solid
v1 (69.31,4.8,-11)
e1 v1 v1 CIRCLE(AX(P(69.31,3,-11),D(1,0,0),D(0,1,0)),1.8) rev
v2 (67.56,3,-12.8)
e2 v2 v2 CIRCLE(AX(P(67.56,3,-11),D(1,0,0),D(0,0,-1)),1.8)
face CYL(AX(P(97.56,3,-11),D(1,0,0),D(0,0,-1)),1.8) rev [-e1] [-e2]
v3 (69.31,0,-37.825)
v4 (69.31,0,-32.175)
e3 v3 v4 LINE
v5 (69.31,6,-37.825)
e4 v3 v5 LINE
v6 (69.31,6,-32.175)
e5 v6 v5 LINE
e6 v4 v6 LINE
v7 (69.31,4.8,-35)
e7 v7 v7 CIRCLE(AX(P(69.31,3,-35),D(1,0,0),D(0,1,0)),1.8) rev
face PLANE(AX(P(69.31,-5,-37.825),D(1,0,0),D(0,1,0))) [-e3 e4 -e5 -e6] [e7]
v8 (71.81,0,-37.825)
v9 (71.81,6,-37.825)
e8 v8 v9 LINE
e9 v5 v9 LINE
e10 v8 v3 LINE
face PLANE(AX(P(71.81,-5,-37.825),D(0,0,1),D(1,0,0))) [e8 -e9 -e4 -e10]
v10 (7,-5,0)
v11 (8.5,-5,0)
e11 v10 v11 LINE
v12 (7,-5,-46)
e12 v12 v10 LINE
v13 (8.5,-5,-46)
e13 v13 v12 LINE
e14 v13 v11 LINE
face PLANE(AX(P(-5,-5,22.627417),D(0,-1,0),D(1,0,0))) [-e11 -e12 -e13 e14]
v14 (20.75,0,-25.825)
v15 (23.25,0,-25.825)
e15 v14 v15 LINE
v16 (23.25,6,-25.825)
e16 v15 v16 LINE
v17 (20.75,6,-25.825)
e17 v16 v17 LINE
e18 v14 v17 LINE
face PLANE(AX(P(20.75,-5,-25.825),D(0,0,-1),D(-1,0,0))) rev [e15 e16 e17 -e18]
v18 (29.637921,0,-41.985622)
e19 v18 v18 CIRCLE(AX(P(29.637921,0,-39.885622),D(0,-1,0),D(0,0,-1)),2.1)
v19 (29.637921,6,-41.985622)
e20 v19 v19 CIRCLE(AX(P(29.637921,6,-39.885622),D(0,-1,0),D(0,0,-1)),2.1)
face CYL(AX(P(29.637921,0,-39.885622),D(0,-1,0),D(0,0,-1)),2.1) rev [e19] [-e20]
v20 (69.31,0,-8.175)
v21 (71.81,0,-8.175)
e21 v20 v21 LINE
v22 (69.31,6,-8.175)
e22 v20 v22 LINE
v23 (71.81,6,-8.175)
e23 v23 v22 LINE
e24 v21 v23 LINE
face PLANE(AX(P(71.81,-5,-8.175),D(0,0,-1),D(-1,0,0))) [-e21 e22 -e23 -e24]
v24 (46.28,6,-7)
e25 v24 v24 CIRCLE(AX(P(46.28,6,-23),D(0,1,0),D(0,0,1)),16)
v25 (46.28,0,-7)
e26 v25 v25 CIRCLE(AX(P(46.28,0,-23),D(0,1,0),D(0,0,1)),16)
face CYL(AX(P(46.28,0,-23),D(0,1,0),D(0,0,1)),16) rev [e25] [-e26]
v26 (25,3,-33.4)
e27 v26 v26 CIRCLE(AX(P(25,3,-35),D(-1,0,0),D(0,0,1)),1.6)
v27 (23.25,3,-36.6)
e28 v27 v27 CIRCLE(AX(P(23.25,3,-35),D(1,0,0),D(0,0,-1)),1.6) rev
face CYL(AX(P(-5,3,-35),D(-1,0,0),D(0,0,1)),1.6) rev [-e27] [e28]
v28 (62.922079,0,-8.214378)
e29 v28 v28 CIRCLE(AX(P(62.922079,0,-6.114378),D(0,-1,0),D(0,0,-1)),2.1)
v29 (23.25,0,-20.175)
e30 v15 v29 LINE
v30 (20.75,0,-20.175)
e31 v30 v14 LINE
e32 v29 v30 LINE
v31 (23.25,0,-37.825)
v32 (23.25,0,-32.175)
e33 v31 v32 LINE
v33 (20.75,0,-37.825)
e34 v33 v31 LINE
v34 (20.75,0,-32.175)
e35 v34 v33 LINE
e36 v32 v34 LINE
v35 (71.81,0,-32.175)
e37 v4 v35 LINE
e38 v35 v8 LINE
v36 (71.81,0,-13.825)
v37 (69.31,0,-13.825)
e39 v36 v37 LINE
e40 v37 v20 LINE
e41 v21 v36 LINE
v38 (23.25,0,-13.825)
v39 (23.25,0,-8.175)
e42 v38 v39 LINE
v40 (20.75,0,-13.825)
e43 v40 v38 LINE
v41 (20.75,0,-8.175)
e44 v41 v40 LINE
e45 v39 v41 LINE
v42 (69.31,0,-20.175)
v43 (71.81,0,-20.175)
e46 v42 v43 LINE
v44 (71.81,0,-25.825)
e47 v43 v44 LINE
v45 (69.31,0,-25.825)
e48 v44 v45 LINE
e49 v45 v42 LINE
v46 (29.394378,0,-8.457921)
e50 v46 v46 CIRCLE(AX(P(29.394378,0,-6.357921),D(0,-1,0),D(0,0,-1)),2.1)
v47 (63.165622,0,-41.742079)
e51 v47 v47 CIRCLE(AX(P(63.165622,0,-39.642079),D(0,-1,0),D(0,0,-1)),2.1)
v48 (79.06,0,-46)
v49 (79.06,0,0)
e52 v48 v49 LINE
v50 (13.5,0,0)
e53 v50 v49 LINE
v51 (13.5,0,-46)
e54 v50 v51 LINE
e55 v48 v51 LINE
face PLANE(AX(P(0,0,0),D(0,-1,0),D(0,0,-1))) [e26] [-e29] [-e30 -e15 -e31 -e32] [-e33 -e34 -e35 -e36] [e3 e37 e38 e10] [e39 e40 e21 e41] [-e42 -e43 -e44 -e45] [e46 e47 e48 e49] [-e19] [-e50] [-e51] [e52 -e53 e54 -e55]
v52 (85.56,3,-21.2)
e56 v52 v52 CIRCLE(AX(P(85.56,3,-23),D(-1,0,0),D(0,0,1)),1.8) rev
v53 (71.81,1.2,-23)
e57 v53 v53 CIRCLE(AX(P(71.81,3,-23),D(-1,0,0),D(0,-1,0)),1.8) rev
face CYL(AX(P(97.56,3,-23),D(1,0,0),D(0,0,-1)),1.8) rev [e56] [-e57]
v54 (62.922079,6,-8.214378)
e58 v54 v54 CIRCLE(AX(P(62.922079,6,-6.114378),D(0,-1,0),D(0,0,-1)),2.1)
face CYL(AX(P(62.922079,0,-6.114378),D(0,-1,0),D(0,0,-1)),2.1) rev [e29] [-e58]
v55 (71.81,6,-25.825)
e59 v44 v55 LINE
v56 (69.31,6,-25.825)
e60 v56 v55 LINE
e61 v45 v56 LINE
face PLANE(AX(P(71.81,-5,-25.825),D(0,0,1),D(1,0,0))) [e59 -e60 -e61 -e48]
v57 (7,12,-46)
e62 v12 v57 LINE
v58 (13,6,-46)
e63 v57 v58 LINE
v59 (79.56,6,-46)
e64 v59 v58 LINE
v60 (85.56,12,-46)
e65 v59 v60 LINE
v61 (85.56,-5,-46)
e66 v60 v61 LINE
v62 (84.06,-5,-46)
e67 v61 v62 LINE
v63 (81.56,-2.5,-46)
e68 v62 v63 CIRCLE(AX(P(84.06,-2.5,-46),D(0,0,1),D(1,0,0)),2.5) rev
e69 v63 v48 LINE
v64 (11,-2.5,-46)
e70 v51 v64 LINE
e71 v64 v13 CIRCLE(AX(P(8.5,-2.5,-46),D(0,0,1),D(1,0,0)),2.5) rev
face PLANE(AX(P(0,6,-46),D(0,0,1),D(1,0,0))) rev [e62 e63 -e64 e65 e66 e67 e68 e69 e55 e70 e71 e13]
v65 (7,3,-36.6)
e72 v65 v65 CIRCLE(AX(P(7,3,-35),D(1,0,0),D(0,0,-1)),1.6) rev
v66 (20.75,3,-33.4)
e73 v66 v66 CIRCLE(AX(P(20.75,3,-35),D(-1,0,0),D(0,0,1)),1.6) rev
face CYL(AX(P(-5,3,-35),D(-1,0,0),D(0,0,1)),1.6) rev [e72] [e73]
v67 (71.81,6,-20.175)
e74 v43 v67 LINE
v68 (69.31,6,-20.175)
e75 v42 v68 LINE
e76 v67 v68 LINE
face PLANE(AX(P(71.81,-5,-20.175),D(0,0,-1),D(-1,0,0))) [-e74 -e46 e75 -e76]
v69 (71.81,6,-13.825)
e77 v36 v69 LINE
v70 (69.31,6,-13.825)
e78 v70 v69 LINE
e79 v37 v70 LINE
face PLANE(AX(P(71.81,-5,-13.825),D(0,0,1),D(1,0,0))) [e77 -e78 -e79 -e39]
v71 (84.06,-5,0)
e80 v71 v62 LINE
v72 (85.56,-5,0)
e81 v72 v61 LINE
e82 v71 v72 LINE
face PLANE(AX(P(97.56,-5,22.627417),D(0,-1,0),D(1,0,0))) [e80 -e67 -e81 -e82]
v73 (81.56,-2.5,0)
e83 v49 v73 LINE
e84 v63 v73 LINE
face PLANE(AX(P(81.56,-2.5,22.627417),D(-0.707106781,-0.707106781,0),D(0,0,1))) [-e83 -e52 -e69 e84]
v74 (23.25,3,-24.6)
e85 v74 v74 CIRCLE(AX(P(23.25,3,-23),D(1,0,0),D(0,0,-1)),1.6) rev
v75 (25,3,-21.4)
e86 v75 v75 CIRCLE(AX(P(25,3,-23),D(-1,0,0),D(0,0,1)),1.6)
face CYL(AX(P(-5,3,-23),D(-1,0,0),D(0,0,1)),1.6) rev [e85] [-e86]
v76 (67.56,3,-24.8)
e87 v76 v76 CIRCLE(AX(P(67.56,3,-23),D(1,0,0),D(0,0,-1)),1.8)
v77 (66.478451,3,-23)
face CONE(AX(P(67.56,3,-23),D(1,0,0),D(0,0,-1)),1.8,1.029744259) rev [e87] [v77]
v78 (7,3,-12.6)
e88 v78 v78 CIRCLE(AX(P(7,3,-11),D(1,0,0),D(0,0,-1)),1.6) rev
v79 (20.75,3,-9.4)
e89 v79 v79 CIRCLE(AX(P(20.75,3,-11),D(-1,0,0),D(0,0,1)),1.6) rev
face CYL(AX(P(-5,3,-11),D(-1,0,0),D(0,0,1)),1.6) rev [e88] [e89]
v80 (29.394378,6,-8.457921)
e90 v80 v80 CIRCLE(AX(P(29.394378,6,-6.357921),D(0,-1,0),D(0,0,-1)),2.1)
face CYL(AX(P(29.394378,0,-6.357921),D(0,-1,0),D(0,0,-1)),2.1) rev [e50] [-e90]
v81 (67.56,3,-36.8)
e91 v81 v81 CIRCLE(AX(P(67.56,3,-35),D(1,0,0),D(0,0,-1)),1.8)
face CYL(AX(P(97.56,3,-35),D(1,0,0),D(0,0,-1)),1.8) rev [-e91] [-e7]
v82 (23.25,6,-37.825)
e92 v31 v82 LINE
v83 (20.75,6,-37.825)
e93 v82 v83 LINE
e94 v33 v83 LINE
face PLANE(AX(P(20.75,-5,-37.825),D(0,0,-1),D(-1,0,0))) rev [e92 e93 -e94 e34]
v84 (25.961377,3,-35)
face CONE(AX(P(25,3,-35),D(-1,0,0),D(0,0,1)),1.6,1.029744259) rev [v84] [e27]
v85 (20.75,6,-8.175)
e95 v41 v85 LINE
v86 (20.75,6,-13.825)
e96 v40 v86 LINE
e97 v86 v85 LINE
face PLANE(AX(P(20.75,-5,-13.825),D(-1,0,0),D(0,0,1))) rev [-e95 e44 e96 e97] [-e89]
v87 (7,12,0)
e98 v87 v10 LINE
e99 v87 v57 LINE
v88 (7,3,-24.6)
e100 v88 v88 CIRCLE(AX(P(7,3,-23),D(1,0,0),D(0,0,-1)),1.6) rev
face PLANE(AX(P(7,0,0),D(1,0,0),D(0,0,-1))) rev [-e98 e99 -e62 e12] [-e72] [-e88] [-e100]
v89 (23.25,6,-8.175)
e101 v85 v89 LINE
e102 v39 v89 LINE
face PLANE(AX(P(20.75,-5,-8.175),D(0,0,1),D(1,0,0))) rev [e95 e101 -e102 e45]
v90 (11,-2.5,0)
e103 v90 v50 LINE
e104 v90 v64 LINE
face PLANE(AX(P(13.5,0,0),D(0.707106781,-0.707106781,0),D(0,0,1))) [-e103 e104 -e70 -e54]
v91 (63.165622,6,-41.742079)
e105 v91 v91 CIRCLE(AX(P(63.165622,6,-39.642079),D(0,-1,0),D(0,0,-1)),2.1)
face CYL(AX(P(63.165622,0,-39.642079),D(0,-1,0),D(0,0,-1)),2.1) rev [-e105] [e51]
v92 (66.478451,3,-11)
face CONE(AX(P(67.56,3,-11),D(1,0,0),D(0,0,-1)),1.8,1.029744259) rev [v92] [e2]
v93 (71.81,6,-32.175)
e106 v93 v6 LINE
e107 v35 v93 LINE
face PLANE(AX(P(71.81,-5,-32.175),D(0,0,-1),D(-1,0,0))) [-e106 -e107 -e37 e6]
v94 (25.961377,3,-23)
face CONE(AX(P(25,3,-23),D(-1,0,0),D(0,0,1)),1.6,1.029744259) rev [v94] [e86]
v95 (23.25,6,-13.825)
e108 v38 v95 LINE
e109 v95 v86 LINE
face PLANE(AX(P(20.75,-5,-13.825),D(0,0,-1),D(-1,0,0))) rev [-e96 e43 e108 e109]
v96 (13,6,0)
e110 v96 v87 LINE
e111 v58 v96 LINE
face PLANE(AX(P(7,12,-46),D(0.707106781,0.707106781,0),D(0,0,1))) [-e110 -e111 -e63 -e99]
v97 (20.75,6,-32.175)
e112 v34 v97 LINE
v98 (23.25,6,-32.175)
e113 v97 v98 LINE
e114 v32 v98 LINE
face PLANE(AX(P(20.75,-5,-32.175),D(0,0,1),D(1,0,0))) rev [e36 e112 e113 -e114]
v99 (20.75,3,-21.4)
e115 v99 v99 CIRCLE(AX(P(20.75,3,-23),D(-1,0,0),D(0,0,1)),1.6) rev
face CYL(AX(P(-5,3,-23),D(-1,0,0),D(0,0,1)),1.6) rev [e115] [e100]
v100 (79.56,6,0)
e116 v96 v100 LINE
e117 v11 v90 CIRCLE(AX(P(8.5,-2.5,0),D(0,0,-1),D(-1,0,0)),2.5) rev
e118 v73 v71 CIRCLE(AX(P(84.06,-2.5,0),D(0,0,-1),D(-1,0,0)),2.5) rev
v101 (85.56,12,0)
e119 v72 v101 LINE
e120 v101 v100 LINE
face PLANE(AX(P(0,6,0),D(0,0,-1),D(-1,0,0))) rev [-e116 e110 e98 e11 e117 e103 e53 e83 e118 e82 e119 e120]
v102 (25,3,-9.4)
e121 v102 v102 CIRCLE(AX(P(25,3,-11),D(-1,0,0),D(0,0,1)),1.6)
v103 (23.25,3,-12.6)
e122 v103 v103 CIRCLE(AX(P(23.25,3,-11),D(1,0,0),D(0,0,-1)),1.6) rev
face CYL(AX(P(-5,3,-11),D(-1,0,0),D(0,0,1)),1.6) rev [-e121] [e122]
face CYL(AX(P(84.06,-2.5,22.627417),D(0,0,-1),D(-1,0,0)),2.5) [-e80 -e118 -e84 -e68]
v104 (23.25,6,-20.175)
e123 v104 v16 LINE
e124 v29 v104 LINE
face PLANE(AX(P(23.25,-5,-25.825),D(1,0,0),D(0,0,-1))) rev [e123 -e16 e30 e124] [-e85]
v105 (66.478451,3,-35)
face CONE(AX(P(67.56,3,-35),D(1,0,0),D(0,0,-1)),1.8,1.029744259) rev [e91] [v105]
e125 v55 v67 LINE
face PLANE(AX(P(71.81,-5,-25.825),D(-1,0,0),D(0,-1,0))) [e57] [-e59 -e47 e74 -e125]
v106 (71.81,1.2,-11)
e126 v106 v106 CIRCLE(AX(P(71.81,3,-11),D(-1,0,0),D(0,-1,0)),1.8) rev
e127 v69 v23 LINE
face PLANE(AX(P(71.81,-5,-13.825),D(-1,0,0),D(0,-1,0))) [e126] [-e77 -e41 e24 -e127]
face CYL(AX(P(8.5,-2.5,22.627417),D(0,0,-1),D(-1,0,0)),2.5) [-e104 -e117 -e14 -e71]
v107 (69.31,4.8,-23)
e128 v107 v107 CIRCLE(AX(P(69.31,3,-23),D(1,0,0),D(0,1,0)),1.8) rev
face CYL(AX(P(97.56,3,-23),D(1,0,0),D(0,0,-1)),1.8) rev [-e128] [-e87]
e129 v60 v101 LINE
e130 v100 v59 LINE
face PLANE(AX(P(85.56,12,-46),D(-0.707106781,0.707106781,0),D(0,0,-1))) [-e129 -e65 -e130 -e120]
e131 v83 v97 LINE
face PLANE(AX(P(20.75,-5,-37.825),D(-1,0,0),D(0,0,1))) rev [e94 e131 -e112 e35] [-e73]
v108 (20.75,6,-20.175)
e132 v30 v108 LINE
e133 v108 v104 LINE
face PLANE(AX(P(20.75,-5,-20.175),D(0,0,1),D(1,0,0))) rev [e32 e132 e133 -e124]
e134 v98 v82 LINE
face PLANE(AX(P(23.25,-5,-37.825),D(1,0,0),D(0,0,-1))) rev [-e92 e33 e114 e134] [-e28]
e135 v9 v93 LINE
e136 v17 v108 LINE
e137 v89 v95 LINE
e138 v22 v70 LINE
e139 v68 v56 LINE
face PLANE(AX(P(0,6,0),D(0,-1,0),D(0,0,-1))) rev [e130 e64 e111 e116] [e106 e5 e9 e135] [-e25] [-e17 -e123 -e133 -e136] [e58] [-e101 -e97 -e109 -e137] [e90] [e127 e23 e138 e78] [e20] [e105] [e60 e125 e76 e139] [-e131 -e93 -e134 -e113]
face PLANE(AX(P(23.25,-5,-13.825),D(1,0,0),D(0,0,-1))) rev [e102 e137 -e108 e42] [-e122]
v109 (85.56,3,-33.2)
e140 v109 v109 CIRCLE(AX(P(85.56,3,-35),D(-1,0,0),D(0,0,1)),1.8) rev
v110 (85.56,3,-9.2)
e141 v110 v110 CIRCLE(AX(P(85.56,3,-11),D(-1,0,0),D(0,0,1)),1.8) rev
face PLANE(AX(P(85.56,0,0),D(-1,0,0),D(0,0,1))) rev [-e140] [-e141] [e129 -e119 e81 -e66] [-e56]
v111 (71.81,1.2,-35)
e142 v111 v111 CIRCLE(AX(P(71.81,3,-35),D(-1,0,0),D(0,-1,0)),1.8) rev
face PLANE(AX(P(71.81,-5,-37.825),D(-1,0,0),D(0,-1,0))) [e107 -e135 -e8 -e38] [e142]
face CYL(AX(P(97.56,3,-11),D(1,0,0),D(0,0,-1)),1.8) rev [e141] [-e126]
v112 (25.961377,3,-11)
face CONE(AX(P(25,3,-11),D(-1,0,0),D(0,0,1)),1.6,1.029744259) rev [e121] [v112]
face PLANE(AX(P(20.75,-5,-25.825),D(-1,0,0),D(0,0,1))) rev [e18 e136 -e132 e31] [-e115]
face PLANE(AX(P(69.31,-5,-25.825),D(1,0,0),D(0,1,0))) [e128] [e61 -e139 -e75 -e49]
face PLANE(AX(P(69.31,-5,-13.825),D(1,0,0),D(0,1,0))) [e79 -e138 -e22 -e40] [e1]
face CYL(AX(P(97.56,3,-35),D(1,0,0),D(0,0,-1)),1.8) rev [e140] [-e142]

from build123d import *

# Parameters (mm, degrees)
SKETCH1_W                                           = 92.56
SKETCH1_H                                           = 46
BOSS_EXTRUDE1_DEPTH                                 = 6
SKETCH2_W                                           = 7
SKETCH2_H                                           = 46
BOSS_EXTRUDE2_DEPTH                                 = 54
SKETCH3_R                                           = 16
CUT_EXTRUDE1_DEPTH                                  = 120.512985069
SKETCH4_R                                           = 16
CUT_EXTRUDE2_DEPTH                                  = 117.616266447
F_4_2_4_2_DIAMETER_HOLE1_D                          = 4.2
F_4_2_4_2_DIAMETER_HOLE2_D                          = 4.2
CHAMFER1_SIZE                                       = 3.5
CHAMFER2_SIZE                                       = 6
BOSS_EXTRUDE3_DEPTH                                 = 46
FILLET1_R                                           = 2.5
CHAMFER3_SIZE                                       = 2.5
FILLET2_R                                           = 2.5
CSK_FOR_M3_COUNTERSUNK_FLAT_HEAD_SCREW1_D           = 3.2
CSK_FOR_M3_COUNTERSUNK_FLAT_HEAD_SCREW1_DEPTH       = 30
CSK_FOR_M3_COUNTERSUNK_FLAT_HEAD_SCREW1_CSINK_D     = 6.3
CSK_FOR_M3_COUNTERSUNK_FLAT_HEAD_SCREW1_CSINK_ANGLE = 90
CSK_FOR_M3_COUNTERSUNK_FLAT_HEAD_SCREW1_TIP         = 0.96137699
CSK_FOR_M3_COUNTERSUNK_FLAT_HEAD_SCREW2_D           = 3.6
CSK_FOR_M3_COUNTERSUNK_FLAT_HEAD_SCREW2_DEPTH       = 30
CSK_FOR_M3_COUNTERSUNK_FLAT_HEAD_SCREW2_CSINK_D     = 6.3
CSK_FOR_M3_COUNTERSUNK_FLAT_HEAD_SCREW2_CSINK_ANGLE = 90
CSK_FOR_M3_COUNTERSUNK_FLAT_HEAD_SCREW2_TIP         = 1.081549114
SKETCH18_W                                          = 2.5
SKETCH18_H                                          = 5.65
CUT_EXTRUDE4_DEPTH                                  = 121.623188484


with BuildPart() as part:
    # Sketch1 → Boss-Extrude1 (new body)
    with BuildSketch(Plane(origin=(0, 0, 0), x_dir=(1, 0, 0), z_dir=(0, 1, 0))):
        with Locations((46.28, 23)):
            Rectangle(SKETCH1_W, SKETCH1_H)
    extrude(amount=BOSS_EXTRUDE1_DEPTH)

    # Sketch2 → Boss-Extrude2 (add)
    with BuildSketch(Plane(origin=(0, 6, 0), x_dir=(1, 0, 0), z_dir=(0, 1, 0))):
        with Locations((89.06, 23)):
            Rectangle(SKETCH2_W, SKETCH2_H)
        with Locations((3.5, 23)):
            Rectangle(SKETCH2_W, SKETCH2_H)
    extrude(amount=BOSS_EXTRUDE2_DEPTH)

    # Sketch3 → Cut-Extrude1 (cut, through all)
    with BuildSketch(Plane(origin=(92.56, 0, 0), x_dir=(0, 0, -1), z_dir=(1, 0, 0))):
        with Locations((23, 37)):
            Circle(SKETCH3_R)
    extrude(amount=-CUT_EXTRUDE1_DEPTH, mode=Mode.SUBTRACT)

    # Sketch4 → Cut-Extrude2 (cut, through all)
    with BuildSketch(Plane(origin=(0, 6, 0), x_dir=(1, 0, 0), z_dir=(0, 1, 0))):
        with Locations(Location((46.28, 23, 0), (0, 0, 270))):
            Circle(SKETCH4_R)
    extrude(amount=-CUT_EXTRUDE2_DEPTH, mode=Mode.SUBTRACT)

    # Ø4.2 (4.2) Diameter Hole1 (through all)
    with Locations(Plane(origin=(0, 0, 0), x_dir=(-1, 0, 0), z_dir=(0, -1, 0))):
        with Locations((-63.165621688, 39.642079068), (-29.637920932, 39.885621688), (-29.394378312, 6.357920932), (-62.922079068, 6.114378312)):
            Hole(F_4_2_4_2_DIAMETER_HOLE1_D / 2)

    # Ø4.2 (4.2) Diameter Hole2 (through all)
    with Locations(Plane.ZY):
        with Locations((-39.885621688, 53.642079068), (-6.357920932, 53.885621688), (-6.114378312, 20.357920932), (-39.642079068, 20.114378312)):
            Hole(F_4_2_4_2_DIAMETER_HOLE2_D / 2)

    # Chamfer1
    chamfer1_edges = [part.edges().sort_by_distance(p)[0] for p in [
        (89.06, 60, -46),
        (89.06, 60, 0),
        (3.5, 60, 0),
        (3.5, 60, -46),
    ]]
    chamfer(chamfer1_edges, length=CHAMFER1_SIZE)

    # Chamfer2
    chamfer2_edges = [part.edges().sort_by_distance(p)[0] for p in [
        (85.56, 6, -23),
        (7, 6, -23),
    ]]
    chamfer(chamfer2_edges, length=CHAMFER2_SIZE)

    # Sketch10 → Boss-Extrude3 (add)
    with BuildSketch(Plane(origin=(0, 0, -46), x_dir=(-1, 0, 0), z_dir=(0, 0, -1))):
        Polygon((0, 11), (5, 11), (5, -5), (-11, -5), (-11, 0), (0, 0), align=None)
        Polygon((-81.56, 0), (-92.56, 0), (-92.56, 11), (-97.56, 11), (-97.56, -5), (-81.56, -5), align=None)
    extrude(amount=-BOSS_EXTRUDE3_DEPTH)

    # Fillet1
    fillet1_edges = [part.edges().sort_by_distance(p)[0] for p in [
        (-5, 11, -23),
        (11, -5, -23),
        (81.56, -5, -23),
        (97.56, 11, -23),
    ]]
    fillet(fillet1_edges, radius=FILLET1_R)

    # Chamfer3
    chamfer3_edges = [part.edges().sort_by_distance(p)[0] for p in [
        (92.56, 11, -23),
        (81.56, 0, -23),
        (11, 0, -23),
        (0, 11, -23),
    ]]
    chamfer(chamfer3_edges, length=CHAMFER3_SIZE - 0.0001)  # a hair under: the kernel refuses the full size

    # Fillet2
    fillet2_edges = [part.edges().sort_by_distance(p)[0] for p in [
        (-5, -5, -23),
        (97.56, -5, -23),
    ]]
    fillet(fillet2_edges, radius=FILLET2_R)

    # CSK for M3 Countersunk Flat Head Screw1
    with Locations(Plane.ZY.offset(5)):
        with Locations((-11, 3), (-23, 3), (-35, 3)):
            CounterSinkHole(CSK_FOR_M3_COUNTERSUNK_FLAT_HEAD_SCREW1_D / 2, CSK_FOR_M3_COUNTERSUNK_FLAT_HEAD_SCREW1_CSINK_D / 2, depth=CSK_FOR_M3_COUNTERSUNK_FLAT_HEAD_SCREW1_DEPTH, counter_sink_angle=CSK_FOR_M3_COUNTERSUNK_FLAT_HEAD_SCREW1_CSINK_ANGLE)
            with Locations((0, 0, -(CSK_FOR_M3_COUNTERSUNK_FLAT_HEAD_SCREW1_DEPTH + CSK_FOR_M3_COUNTERSUNK_FLAT_HEAD_SCREW1_TIP / 2))):  # 118° drill point
                Cone(0, CSK_FOR_M3_COUNTERSUNK_FLAT_HEAD_SCREW1_D / 2, CSK_FOR_M3_COUNTERSUNK_FLAT_HEAD_SCREW1_TIP, mode=Mode.SUBTRACT)

    # CSK for M3 Countersunk Flat Head Screw2
    with Locations(Plane(origin=(97.56, 0, 0), x_dir=(0, 0, -1), z_dir=(1, 0, 0))):
        with Locations((11, 3), (23, 3), (35, 3)):
            CounterSinkHole(CSK_FOR_M3_COUNTERSUNK_FLAT_HEAD_SCREW2_D / 2, CSK_FOR_M3_COUNTERSUNK_FLAT_HEAD_SCREW2_CSINK_D / 2, depth=CSK_FOR_M3_COUNTERSUNK_FLAT_HEAD_SCREW2_DEPTH, counter_sink_angle=CSK_FOR_M3_COUNTERSUNK_FLAT_HEAD_SCREW2_CSINK_ANGLE)
            with Locations((0, 0, -(CSK_FOR_M3_COUNTERSUNK_FLAT_HEAD_SCREW2_DEPTH + CSK_FOR_M3_COUNTERSUNK_FLAT_HEAD_SCREW2_TIP / 2))):  # 118° drill point
                Cone(0, CSK_FOR_M3_COUNTERSUNK_FLAT_HEAD_SCREW2_D / 2, CSK_FOR_M3_COUNTERSUNK_FLAT_HEAD_SCREW2_TIP, mode=Mode.SUBTRACT)

    # Sketch18 → Cut-Extrude4 (cut, through all)
    with BuildSketch(Plane(origin=(0, 6, 0), x_dir=(1, 0, 0), z_dir=(0, 1, 0))):
        with Locations((22, 23)):
            Rectangle(SKETCH18_W, SKETCH18_H)
        with Locations((22, 35)):
            Rectangle(SKETCH18_W, SKETCH18_H)
        with Locations((22, 11)):
            Rectangle(SKETCH18_W, SKETCH18_H)
    cut_extrude4 = extrude(amount=-CUT_EXTRUDE4_DEPTH, mode=Mode.SUBTRACT)

    # Mirror1: Cut-Extrude4 across plane
    add(cut_extrude4.mirror(Plane.ZY.offset(-46.28)), mode=Mode.SUBTRACT)

    # SurfaceCut1
    split(bisect_by=Plane(origin=(7, 0, 0), x_dir=(0, 0, -1), z_dir=(1, 0, 0)), keep=Keep.TOP)

    # SurfaceCut2
    split(bisect_by=Plane.ZY.offset(-85.56), keep=Keep.TOP)


solid = part.part
